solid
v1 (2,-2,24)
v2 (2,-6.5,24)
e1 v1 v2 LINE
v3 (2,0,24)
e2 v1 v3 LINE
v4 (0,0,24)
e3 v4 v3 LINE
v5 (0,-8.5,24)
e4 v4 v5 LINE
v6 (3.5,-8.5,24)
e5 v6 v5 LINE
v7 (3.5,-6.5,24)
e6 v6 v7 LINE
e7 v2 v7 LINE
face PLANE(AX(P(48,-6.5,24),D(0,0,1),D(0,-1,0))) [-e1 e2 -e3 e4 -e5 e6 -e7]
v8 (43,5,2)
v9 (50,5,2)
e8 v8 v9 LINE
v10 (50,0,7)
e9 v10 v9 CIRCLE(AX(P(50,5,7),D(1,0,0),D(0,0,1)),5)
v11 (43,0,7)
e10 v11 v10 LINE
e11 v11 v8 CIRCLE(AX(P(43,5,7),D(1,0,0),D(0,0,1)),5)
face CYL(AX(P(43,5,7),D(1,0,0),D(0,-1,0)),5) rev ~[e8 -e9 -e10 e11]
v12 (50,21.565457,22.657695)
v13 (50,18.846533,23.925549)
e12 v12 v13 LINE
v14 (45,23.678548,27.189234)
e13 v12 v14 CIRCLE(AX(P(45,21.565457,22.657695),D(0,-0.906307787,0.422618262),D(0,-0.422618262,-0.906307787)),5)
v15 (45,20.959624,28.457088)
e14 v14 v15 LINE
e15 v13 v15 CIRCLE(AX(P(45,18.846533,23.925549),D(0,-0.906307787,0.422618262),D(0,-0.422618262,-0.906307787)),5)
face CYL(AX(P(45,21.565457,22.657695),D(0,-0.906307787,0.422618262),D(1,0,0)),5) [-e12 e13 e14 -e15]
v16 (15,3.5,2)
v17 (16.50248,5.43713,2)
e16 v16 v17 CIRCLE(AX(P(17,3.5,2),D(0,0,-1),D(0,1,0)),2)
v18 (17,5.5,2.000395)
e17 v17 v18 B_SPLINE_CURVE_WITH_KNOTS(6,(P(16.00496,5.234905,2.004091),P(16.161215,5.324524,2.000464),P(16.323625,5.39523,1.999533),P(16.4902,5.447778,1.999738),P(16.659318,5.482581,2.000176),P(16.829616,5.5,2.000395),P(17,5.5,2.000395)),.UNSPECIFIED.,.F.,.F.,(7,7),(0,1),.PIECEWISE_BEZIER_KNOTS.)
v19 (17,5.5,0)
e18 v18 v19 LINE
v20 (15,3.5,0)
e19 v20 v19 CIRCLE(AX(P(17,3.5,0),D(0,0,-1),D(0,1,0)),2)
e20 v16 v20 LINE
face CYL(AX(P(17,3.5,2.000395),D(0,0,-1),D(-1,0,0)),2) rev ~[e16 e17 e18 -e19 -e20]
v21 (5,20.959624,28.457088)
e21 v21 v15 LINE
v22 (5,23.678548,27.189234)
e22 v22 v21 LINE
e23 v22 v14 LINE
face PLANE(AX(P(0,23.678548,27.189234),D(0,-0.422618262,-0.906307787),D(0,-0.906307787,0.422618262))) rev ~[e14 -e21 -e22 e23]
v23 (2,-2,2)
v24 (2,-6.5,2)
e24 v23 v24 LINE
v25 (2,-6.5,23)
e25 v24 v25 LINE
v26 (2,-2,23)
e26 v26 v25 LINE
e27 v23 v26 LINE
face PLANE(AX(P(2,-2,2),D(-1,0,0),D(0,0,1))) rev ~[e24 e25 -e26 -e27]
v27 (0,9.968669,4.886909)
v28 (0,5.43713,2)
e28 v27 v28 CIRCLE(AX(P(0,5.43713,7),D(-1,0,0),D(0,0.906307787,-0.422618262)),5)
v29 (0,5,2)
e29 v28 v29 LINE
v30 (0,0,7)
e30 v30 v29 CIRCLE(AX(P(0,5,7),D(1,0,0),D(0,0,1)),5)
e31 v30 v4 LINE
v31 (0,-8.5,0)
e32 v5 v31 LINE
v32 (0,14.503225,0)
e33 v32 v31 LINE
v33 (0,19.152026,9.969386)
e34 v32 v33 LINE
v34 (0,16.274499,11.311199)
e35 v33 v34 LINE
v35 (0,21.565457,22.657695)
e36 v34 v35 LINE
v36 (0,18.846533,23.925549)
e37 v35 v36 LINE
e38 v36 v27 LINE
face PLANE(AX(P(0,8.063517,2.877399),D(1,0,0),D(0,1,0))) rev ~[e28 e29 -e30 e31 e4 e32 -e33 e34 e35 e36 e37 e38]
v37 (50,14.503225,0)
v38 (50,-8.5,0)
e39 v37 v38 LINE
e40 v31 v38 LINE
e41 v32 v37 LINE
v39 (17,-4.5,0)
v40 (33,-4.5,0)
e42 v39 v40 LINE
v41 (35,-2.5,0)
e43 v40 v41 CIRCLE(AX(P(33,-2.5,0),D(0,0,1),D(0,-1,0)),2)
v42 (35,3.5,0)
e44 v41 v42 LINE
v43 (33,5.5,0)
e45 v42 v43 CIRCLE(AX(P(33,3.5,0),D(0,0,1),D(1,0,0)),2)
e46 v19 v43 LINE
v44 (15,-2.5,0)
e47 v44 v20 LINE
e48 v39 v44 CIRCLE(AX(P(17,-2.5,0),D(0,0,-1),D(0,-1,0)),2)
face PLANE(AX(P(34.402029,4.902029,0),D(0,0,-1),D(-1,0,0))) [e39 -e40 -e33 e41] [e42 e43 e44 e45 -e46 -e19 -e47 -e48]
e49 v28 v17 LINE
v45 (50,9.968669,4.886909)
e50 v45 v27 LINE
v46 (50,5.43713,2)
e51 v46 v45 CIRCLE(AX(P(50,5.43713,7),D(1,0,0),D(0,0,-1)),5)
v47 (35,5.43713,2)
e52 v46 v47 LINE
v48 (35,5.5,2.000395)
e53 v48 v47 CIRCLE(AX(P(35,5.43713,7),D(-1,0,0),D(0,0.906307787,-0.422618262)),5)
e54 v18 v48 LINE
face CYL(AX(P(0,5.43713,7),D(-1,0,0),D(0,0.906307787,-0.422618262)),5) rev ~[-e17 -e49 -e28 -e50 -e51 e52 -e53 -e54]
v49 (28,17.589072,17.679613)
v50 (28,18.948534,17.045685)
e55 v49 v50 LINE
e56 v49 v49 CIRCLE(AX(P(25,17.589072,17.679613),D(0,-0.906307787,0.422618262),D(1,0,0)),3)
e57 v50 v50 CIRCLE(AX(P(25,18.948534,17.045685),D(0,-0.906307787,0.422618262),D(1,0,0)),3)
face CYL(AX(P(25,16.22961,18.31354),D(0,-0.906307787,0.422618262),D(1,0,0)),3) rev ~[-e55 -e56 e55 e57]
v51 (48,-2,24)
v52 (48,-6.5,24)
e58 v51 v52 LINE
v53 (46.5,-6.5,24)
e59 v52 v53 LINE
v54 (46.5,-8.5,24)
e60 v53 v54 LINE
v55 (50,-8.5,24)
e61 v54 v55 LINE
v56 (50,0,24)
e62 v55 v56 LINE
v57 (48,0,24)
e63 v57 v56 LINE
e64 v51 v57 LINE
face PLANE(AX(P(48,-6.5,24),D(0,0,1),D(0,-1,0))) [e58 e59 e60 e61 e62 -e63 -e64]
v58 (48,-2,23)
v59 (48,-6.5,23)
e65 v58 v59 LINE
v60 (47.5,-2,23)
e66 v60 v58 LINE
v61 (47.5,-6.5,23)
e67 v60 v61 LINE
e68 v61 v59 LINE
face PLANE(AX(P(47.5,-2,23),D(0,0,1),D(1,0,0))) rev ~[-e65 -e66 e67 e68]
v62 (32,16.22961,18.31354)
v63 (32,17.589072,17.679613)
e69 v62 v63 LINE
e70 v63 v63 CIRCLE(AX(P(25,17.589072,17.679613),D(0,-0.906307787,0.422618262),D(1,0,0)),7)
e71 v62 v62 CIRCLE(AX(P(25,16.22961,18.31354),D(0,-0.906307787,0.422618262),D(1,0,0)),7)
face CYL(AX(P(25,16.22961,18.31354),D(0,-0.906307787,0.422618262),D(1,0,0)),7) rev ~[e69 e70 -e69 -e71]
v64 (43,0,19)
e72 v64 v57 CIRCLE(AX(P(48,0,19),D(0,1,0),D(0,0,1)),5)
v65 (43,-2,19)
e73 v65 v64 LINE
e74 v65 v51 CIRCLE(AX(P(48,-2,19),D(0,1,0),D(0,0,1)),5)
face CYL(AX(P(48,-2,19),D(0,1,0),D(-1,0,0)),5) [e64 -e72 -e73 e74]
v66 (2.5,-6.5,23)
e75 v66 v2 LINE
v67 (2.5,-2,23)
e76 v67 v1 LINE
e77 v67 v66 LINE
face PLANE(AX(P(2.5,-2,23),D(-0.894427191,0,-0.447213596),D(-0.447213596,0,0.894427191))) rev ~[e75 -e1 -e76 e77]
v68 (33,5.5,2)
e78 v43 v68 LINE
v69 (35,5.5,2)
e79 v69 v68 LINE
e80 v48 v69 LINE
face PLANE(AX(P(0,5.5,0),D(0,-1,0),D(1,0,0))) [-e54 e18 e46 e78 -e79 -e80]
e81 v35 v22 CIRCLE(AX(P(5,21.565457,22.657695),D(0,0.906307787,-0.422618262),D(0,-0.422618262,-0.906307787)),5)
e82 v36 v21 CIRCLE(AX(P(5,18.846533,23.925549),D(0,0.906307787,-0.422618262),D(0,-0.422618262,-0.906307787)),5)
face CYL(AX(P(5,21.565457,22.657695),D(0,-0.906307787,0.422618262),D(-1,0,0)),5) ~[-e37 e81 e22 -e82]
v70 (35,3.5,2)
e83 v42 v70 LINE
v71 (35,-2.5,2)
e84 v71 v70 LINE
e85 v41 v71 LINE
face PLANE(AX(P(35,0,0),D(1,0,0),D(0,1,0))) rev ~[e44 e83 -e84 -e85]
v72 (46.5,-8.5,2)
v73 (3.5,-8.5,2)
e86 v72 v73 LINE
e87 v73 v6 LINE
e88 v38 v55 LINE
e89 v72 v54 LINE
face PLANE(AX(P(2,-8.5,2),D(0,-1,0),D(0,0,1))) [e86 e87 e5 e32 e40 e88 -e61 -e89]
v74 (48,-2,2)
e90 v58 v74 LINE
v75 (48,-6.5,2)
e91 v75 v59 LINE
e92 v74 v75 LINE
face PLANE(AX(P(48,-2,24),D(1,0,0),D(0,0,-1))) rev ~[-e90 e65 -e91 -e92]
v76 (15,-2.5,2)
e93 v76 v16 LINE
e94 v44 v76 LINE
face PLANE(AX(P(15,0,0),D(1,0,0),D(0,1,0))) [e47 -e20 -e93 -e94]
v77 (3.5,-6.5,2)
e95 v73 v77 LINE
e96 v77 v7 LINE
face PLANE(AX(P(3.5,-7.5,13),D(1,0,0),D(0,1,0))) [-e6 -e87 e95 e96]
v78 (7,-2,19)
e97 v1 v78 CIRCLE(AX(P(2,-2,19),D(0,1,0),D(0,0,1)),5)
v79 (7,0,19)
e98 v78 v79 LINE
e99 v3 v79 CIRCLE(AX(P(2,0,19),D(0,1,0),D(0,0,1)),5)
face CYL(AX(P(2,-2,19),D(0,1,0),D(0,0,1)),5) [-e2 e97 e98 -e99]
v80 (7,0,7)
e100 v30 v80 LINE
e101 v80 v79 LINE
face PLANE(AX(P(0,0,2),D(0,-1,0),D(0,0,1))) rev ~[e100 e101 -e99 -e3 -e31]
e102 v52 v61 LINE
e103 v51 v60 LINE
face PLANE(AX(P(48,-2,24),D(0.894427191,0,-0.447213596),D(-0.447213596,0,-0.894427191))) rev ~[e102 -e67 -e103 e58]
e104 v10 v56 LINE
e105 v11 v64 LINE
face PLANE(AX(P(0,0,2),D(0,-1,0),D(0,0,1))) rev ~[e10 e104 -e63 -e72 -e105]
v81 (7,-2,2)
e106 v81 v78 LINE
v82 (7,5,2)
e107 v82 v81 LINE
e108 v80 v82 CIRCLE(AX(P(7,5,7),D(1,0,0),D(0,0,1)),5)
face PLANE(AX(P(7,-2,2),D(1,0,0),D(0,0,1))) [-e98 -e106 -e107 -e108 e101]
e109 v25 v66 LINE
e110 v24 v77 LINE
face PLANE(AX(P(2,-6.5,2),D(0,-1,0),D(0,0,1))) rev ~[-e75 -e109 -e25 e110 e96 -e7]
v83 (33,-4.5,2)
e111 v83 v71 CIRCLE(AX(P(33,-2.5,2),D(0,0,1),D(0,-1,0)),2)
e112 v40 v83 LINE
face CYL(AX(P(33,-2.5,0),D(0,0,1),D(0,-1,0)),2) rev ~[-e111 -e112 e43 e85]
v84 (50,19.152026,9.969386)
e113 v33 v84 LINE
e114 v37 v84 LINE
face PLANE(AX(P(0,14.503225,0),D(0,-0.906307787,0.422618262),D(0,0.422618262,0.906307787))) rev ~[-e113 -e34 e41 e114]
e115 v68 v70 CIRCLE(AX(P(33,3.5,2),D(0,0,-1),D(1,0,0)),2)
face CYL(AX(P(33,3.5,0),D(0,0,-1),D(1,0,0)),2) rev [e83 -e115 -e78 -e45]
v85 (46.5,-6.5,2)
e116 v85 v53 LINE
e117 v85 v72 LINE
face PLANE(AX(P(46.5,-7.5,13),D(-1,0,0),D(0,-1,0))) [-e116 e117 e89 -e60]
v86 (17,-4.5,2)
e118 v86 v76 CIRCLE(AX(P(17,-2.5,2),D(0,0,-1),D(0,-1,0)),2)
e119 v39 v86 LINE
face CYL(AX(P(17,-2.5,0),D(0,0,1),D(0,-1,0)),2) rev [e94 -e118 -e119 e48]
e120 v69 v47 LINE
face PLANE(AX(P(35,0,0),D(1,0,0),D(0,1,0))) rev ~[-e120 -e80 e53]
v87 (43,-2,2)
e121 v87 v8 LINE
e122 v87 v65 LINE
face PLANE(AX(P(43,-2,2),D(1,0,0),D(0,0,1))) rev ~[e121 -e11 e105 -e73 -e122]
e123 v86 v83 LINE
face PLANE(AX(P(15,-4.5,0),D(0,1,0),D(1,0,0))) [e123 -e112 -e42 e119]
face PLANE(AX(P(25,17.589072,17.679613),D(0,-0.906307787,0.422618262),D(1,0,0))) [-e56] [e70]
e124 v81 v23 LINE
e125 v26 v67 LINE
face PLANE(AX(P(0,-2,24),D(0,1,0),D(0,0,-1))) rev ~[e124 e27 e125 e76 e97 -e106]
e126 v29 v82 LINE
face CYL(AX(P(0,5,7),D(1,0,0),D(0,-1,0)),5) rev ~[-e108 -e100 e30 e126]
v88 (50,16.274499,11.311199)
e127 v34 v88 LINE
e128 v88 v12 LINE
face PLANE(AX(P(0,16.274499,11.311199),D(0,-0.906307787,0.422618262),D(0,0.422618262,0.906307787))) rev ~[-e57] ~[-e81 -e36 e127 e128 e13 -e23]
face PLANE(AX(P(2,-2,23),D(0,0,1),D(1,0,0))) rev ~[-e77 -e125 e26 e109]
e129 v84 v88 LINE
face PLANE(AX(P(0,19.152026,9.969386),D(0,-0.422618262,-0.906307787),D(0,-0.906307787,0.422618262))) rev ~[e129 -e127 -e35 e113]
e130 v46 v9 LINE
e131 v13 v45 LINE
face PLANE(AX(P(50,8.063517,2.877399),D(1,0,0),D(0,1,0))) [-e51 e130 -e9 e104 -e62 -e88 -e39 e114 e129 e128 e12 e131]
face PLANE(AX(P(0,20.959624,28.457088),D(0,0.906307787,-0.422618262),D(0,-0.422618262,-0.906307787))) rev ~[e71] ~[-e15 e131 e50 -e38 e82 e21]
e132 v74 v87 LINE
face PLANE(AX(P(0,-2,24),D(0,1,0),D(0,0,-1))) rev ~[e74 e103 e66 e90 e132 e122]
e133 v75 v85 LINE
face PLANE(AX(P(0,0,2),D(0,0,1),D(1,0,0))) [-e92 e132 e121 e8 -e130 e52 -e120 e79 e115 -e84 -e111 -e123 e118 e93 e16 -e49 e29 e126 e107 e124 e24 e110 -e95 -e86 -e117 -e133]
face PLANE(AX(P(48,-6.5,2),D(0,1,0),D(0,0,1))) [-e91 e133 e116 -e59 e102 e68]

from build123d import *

# Parameters (mm, degrees)
F1_DEPTH      = 50
F3_DEPTH      = 3
F5_DEPTH      = 6.5
F6_W          = 2
F6_H          = 22
F5_FACE1_W    = 6.5
F5_FACE1_H    = 22
F7_DEPTH      = 1.5
F8_W          = 2
F8_H          = 22
F9_DEPTH      = 1.5
F10_W         = 36
F10_H         = 22
F11_DEPTH     = 2
F12_W         = 20
F12_H         = 10
F13_DEPTH     = 28.4580883963
F14_T4_DEPTH  = 50
F14_T10_DEPTH = 50
F14_T16_DEPTH = 50
F14_T23_DEPTH = 50
F14_T29_DEPTH = 50
F15_R         = 5
F16_T4_DEPTH  = 7.0003952761
F17_R         = 2
F18_R         = 2
F19_R         = 7
F19_R_2       = 3
F20_DEPTH     = 1.5
F22_DEPTH     = 4.5
F24_DEPTH     = 4.5
F25_R         = 5
F26_R         = 5


# Not quite as in the source:
# - a fillet or chamfer that OpenCascade refuses, or shapes differently, is made with other operations: its cross-section is extruded or revolved along the edge and cut away or added


with BuildPart() as f1:
    # F0 (on Right) → F1 (new body)
    with BuildSketch(Plane.YZ):
        Polygon((-2, 0), (0, 0), (0, 2), (0, 24), (-2, 24), align=None)
        Polygon((0, 2), (0, 0), (11, 0), (16.274498548, 11.3111986384), (23.6785478522, 27.1892336111), (20.9596244911, 28.4570883963), (8.6224815594, 2), align=None)
        Polygon((16.274498548, 11.3111986384), (11, 0), (14.5032248927, 0), (19.1520257719, 9.9693856574), align=None)
    extrude(amount=F1_DEPTH)

    # F2 (on face) → F3 (cut, through all)
    with BuildSketch(Plane(origin=(0, 6.3164084922, -2.9453896519), x_dir=(1, 0, 0), z_dir=(0, -0.906307787, 0.4226182617))):
        with BuildLine():
            ThreePointArc((22, 23.4566337426), (25, 20.4566337426), (28, 23.4566337426))
            Line((28, 23.4566337426), (22, 23.4566337426))
        make_face()
        with BuildLine():
            Line((22, 23.4566337426), (28, 23.4566337426))
            ThreePointArc((28, 23.4566337426), (25, 26.4566337426), (22, 23.4566337426))
        make_face()
    extrude(amount=-F3_DEPTH, mode=Mode.SUBTRACT)

    # F4 (on face) → F5 (join)
    with BuildSketch(Plane.XZ.offset(2)):
        Polygon((2, 2), (2, 24), (0, 24), (0, 0), (50, 0), (50, 24), (48, 24), (48, 2), align=None)
    extrude(amount=F5_DEPTH)

    # F6 (on face) + F5_face1 (on face) → F7 (join)
    with BuildSketch(Plane.YZ.offset(2)):
        with Locations((-7.5, 13)):
            Rectangle(F6_W, F6_H)
    with BuildSketch(Plane(origin=(48, -5.25, 13), x_dir=(0, -1, 0), z_dir=(-1, 0, 0))):
        Rectangle(F5_FACE1_W, F5_FACE1_H)
    extrude(amount=F7_DEPTH, dir=(1, 0, 0))

    # F8 (on face) → F9 (join)
    with BuildSketch(Plane(origin=(48, 0, 0), x_dir=(0, -1, 0), z_dir=(-1, 0, 0))):
        with Locations((7.5, 13)):
            Rectangle(F8_W, F8_H)
    extrude(amount=F9_DEPTH)

    # F10 (on face) → F11 (cut)
    with BuildSketch(Plane.XZ.offset(2)):
        with Locations((25, 13)):
            Rectangle(F10_W, F10_H)
    extrude(amount=-F11_DEPTH, mode=Mode.SUBTRACT)

    # F12 (on Top) → F13 (cut, through all)
    with BuildSketch(Plane.XY):
        with Locations((25, 0.5)):
            Rectangle(F12_W, F12_H)
    extrude(amount=F13_DEPTH, mode=Mode.SUBTRACT)

    # F14: fillet of radius 5 on 1 edges, made by hand


with BuildPart() as f14_tool2:
    # F14_s3 → F14_t4 (new body)
    with BuildSketch(Plane.YZ):
        with BuildLine():
            ThreePointArc((9.9686691906, 4.8869086913), (8.1236282971, 2.7830427709), (5.4371302554, 2))
            Line((5.4371302554, 2), (8.6224815594, 2))
            Line((8.6224815594, 2), (9.9686691906, 4.8869086913))
        make_face()
    extrude(amount=F14_T4_DEPTH)

    split(bisect_by=Plane.XZ.offset(-5.5), keep=Keep.BOTTOM)

    split(bisect_by=Plane.YZ.offset(15), keep=Keep.BOTTOM)


with BuildPart() as f1_1:
    add(f1.part)

    # F14_t1: union F14_tool2
    add(f14_tool2.part)


with BuildPart() as f14_tool8:
    # F14_s9 → F14_t10 (new body)
    with BuildSketch(Plane.YZ):
        with BuildLine():
            ThreePointArc((9.9686691906, 4.8869086913), (8.1236282971, 2.7830427709), (5.4371302554, 2))
            Line((5.4371302554, 2), (8.6224815594, 2))
            Line((8.6224815594, 2), (9.9686691906, 4.8869086913))
        make_face()
    extrude(amount=F14_T10_DEPTH)

    split(bisect_by=Plane.XZ.offset(-5.5), keep=Keep.TOP)

    split(bisect_by=Plane.YZ.offset(15), keep=Keep.BOTTOM)


with BuildPart() as f1_2:
    add(f1_1.part)

    # F14_t7: union F14_tool8
    add(f14_tool8.part)


with BuildPart() as f14_tool14:
    # F14_s15 → F14_t16 (new body)
    with BuildSketch(Plane.YZ):
        with BuildLine():
            ThreePointArc((9.9686691906, 4.8869086913), (8.1236282971, 2.7830427709), (5.4371302554, 2))
            Line((5.4371302554, 2), (8.6224815594, 2))
            Line((8.6224815594, 2), (9.9686691906, 4.8869086913))
        make_face()
    extrude(amount=F14_T16_DEPTH)

    split(bisect_by=Plane.XZ.offset(-5.5), keep=Keep.BOTTOM)

    split(bisect_by=Plane.YZ.offset(15), keep=Keep.TOP)

    split(bisect_by=Plane.YZ.offset(35), keep=Keep.BOTTOM)


with BuildPart() as f1_3:
    add(f1_2.part)

    # F14_t13: union F14_tool14
    add(f14_tool14.part)


with BuildPart() as f14_tool21:
    # F14_s22 → F14_t23 (new body)
    with BuildSketch(Plane.YZ):
        with BuildLine():
            ThreePointArc((9.9686691906, 4.8869086913), (8.1236282971, 2.7830427709), (5.4371302554, 2))
            Line((5.4371302554, 2), (8.6224815594, 2))
            Line((8.6224815594, 2), (9.9686691906, 4.8869086913))
        make_face()
    extrude(amount=F14_T23_DEPTH)

    split(bisect_by=Plane.XZ.offset(-5.5), keep=Keep.BOTTOM)

    split(bisect_by=Plane.YZ.offset(35), keep=Keep.TOP)


with BuildPart() as f1_4:
    add(f1_3.part)

    # F14_t20: union F14_tool21
    add(f14_tool21.part)


with BuildPart() as f14_tool27:
    # F14_s28 → F14_t29 (new body)
    with BuildSketch(Plane.YZ):
        with BuildLine():
            ThreePointArc((9.9686691906, 4.8869086913), (8.1236282971, 2.7830427709), (5.4371302554, 2))
            Line((5.4371302554, 2), (8.6224815594, 2))
            Line((8.6224815594, 2), (9.9686691906, 4.8869086913))
        make_face()
    extrude(amount=F14_T29_DEPTH)

    split(bisect_by=Plane.XZ.offset(-5.5), keep=Keep.TOP)

    split(bisect_by=Plane.YZ.offset(35), keep=Keep.TOP)


with BuildPart() as f1_5:
    add(f1_4.part)

    # F14_t26: union F14_tool27
    add(f14_tool27.part)

    # F15
    f15_edges = [f1_5.edges().sort_by_distance(p)[0] for p in [
        (3.5, 0, 2),
        (46.5, 0, 2),
    ]]
    fillet(f15_edges, radius=F15_R)

    # F16: fillet of radius 2 on 1 edges, made by hand


with BuildPart() as f16_tool2:
    # F16_s3 → F16_t4 (new body)
    with BuildSketch(Plane.XY):
        with BuildLine():
            ThreePointArc((35, 3.5), (34.4142135624, 4.9142135624), (33, 5.5))
            Line((33, 5.5), (33, 5.54))
            Line((33, 5.54), (35.04, 5.54))
            Line((35.04, 5.54), (35.04, 3.5))
            Line((35.04, 3.5), (35, 3.5))
        make_face()
    extrude(amount=F16_T4_DEPTH)

    split(bisect_by=Plane.XY.offset(2), keep=Keep.BOTTOM)


with BuildPart() as f1_6:
    add(f1_5.part)

    # F16_t1: union F16_tool2
    add(f16_tool2.part)

    # F17#2 (call 1 of 2: OpenCascade refuses the feature's edges together)
    f17_2_edges = [f1_6.edges().sort_by_distance(p)[0] for p in [
        (15, -4.5, 1),
    ]]
    fillet(f17_2_edges, radius=F17_R)

    # F17 (call 2 of 2)
    f17_edges = [f1_6.edges().sort_by_distance(p)[0] for p in [
        (15, 5.5, 1.000198),
    ]]
    fillet(f17_edges, radius=F17_R)

    # F18
    f18_edges = [f1_6.edges().sort_by_distance(p)[0] for p in [
        (35, -4.5, 1),
    ]]
    fillet(f18_edges, radius=F18_R)

    # F19 (on face) → F20 (cut)
    with BuildSketch(Plane(origin=(0, 6.3164084922, -2.9453896519), x_dir=(1, 0, 0), z_dir=(0, -0.906307787, 0.4226182617))):
        with Locations((25, 23.4566337426)):
            Circle(F19_R)
        with Locations((25, 23.4566337426)):
            Circle(F19_R_2, mode=Mode.SUBTRACT)
    extrude(amount=-F20_DEPTH, mode=Mode.SUBTRACT)

    # F21 (on face) → F22 (join, through all)
    with BuildSketch(Plane.XZ.offset(2)):
        Polygon((48, 23), (48, 24), (47.5, 23), align=None)
    extrude(amount=F22_DEPTH)

    # F23 (on face) → F24 (join, through all)
    with BuildSketch(Plane.XZ.offset(2)):
        Polygon((2.5, 23), (2, 24), (2, 23), align=None)
    extrude(amount=F24_DEPTH)

    # F25
    f25_edges = [f1_6.edges().sort_by_distance(p)[0] for p in [
        (50, 22.319086, 27.823161),
        (0, 22.319086, 27.823161),
    ]]
    fillet(f25_edges, radius=F25_R)

    # F26
    f26_edges = [f1_6.edges().sort_by_distance(p)[0] for p in [
        (7, -1, 24),
        (43, -1, 24),
    ]]
    fillet(f26_edges, radius=F26_R)


solid = f1_6.part
